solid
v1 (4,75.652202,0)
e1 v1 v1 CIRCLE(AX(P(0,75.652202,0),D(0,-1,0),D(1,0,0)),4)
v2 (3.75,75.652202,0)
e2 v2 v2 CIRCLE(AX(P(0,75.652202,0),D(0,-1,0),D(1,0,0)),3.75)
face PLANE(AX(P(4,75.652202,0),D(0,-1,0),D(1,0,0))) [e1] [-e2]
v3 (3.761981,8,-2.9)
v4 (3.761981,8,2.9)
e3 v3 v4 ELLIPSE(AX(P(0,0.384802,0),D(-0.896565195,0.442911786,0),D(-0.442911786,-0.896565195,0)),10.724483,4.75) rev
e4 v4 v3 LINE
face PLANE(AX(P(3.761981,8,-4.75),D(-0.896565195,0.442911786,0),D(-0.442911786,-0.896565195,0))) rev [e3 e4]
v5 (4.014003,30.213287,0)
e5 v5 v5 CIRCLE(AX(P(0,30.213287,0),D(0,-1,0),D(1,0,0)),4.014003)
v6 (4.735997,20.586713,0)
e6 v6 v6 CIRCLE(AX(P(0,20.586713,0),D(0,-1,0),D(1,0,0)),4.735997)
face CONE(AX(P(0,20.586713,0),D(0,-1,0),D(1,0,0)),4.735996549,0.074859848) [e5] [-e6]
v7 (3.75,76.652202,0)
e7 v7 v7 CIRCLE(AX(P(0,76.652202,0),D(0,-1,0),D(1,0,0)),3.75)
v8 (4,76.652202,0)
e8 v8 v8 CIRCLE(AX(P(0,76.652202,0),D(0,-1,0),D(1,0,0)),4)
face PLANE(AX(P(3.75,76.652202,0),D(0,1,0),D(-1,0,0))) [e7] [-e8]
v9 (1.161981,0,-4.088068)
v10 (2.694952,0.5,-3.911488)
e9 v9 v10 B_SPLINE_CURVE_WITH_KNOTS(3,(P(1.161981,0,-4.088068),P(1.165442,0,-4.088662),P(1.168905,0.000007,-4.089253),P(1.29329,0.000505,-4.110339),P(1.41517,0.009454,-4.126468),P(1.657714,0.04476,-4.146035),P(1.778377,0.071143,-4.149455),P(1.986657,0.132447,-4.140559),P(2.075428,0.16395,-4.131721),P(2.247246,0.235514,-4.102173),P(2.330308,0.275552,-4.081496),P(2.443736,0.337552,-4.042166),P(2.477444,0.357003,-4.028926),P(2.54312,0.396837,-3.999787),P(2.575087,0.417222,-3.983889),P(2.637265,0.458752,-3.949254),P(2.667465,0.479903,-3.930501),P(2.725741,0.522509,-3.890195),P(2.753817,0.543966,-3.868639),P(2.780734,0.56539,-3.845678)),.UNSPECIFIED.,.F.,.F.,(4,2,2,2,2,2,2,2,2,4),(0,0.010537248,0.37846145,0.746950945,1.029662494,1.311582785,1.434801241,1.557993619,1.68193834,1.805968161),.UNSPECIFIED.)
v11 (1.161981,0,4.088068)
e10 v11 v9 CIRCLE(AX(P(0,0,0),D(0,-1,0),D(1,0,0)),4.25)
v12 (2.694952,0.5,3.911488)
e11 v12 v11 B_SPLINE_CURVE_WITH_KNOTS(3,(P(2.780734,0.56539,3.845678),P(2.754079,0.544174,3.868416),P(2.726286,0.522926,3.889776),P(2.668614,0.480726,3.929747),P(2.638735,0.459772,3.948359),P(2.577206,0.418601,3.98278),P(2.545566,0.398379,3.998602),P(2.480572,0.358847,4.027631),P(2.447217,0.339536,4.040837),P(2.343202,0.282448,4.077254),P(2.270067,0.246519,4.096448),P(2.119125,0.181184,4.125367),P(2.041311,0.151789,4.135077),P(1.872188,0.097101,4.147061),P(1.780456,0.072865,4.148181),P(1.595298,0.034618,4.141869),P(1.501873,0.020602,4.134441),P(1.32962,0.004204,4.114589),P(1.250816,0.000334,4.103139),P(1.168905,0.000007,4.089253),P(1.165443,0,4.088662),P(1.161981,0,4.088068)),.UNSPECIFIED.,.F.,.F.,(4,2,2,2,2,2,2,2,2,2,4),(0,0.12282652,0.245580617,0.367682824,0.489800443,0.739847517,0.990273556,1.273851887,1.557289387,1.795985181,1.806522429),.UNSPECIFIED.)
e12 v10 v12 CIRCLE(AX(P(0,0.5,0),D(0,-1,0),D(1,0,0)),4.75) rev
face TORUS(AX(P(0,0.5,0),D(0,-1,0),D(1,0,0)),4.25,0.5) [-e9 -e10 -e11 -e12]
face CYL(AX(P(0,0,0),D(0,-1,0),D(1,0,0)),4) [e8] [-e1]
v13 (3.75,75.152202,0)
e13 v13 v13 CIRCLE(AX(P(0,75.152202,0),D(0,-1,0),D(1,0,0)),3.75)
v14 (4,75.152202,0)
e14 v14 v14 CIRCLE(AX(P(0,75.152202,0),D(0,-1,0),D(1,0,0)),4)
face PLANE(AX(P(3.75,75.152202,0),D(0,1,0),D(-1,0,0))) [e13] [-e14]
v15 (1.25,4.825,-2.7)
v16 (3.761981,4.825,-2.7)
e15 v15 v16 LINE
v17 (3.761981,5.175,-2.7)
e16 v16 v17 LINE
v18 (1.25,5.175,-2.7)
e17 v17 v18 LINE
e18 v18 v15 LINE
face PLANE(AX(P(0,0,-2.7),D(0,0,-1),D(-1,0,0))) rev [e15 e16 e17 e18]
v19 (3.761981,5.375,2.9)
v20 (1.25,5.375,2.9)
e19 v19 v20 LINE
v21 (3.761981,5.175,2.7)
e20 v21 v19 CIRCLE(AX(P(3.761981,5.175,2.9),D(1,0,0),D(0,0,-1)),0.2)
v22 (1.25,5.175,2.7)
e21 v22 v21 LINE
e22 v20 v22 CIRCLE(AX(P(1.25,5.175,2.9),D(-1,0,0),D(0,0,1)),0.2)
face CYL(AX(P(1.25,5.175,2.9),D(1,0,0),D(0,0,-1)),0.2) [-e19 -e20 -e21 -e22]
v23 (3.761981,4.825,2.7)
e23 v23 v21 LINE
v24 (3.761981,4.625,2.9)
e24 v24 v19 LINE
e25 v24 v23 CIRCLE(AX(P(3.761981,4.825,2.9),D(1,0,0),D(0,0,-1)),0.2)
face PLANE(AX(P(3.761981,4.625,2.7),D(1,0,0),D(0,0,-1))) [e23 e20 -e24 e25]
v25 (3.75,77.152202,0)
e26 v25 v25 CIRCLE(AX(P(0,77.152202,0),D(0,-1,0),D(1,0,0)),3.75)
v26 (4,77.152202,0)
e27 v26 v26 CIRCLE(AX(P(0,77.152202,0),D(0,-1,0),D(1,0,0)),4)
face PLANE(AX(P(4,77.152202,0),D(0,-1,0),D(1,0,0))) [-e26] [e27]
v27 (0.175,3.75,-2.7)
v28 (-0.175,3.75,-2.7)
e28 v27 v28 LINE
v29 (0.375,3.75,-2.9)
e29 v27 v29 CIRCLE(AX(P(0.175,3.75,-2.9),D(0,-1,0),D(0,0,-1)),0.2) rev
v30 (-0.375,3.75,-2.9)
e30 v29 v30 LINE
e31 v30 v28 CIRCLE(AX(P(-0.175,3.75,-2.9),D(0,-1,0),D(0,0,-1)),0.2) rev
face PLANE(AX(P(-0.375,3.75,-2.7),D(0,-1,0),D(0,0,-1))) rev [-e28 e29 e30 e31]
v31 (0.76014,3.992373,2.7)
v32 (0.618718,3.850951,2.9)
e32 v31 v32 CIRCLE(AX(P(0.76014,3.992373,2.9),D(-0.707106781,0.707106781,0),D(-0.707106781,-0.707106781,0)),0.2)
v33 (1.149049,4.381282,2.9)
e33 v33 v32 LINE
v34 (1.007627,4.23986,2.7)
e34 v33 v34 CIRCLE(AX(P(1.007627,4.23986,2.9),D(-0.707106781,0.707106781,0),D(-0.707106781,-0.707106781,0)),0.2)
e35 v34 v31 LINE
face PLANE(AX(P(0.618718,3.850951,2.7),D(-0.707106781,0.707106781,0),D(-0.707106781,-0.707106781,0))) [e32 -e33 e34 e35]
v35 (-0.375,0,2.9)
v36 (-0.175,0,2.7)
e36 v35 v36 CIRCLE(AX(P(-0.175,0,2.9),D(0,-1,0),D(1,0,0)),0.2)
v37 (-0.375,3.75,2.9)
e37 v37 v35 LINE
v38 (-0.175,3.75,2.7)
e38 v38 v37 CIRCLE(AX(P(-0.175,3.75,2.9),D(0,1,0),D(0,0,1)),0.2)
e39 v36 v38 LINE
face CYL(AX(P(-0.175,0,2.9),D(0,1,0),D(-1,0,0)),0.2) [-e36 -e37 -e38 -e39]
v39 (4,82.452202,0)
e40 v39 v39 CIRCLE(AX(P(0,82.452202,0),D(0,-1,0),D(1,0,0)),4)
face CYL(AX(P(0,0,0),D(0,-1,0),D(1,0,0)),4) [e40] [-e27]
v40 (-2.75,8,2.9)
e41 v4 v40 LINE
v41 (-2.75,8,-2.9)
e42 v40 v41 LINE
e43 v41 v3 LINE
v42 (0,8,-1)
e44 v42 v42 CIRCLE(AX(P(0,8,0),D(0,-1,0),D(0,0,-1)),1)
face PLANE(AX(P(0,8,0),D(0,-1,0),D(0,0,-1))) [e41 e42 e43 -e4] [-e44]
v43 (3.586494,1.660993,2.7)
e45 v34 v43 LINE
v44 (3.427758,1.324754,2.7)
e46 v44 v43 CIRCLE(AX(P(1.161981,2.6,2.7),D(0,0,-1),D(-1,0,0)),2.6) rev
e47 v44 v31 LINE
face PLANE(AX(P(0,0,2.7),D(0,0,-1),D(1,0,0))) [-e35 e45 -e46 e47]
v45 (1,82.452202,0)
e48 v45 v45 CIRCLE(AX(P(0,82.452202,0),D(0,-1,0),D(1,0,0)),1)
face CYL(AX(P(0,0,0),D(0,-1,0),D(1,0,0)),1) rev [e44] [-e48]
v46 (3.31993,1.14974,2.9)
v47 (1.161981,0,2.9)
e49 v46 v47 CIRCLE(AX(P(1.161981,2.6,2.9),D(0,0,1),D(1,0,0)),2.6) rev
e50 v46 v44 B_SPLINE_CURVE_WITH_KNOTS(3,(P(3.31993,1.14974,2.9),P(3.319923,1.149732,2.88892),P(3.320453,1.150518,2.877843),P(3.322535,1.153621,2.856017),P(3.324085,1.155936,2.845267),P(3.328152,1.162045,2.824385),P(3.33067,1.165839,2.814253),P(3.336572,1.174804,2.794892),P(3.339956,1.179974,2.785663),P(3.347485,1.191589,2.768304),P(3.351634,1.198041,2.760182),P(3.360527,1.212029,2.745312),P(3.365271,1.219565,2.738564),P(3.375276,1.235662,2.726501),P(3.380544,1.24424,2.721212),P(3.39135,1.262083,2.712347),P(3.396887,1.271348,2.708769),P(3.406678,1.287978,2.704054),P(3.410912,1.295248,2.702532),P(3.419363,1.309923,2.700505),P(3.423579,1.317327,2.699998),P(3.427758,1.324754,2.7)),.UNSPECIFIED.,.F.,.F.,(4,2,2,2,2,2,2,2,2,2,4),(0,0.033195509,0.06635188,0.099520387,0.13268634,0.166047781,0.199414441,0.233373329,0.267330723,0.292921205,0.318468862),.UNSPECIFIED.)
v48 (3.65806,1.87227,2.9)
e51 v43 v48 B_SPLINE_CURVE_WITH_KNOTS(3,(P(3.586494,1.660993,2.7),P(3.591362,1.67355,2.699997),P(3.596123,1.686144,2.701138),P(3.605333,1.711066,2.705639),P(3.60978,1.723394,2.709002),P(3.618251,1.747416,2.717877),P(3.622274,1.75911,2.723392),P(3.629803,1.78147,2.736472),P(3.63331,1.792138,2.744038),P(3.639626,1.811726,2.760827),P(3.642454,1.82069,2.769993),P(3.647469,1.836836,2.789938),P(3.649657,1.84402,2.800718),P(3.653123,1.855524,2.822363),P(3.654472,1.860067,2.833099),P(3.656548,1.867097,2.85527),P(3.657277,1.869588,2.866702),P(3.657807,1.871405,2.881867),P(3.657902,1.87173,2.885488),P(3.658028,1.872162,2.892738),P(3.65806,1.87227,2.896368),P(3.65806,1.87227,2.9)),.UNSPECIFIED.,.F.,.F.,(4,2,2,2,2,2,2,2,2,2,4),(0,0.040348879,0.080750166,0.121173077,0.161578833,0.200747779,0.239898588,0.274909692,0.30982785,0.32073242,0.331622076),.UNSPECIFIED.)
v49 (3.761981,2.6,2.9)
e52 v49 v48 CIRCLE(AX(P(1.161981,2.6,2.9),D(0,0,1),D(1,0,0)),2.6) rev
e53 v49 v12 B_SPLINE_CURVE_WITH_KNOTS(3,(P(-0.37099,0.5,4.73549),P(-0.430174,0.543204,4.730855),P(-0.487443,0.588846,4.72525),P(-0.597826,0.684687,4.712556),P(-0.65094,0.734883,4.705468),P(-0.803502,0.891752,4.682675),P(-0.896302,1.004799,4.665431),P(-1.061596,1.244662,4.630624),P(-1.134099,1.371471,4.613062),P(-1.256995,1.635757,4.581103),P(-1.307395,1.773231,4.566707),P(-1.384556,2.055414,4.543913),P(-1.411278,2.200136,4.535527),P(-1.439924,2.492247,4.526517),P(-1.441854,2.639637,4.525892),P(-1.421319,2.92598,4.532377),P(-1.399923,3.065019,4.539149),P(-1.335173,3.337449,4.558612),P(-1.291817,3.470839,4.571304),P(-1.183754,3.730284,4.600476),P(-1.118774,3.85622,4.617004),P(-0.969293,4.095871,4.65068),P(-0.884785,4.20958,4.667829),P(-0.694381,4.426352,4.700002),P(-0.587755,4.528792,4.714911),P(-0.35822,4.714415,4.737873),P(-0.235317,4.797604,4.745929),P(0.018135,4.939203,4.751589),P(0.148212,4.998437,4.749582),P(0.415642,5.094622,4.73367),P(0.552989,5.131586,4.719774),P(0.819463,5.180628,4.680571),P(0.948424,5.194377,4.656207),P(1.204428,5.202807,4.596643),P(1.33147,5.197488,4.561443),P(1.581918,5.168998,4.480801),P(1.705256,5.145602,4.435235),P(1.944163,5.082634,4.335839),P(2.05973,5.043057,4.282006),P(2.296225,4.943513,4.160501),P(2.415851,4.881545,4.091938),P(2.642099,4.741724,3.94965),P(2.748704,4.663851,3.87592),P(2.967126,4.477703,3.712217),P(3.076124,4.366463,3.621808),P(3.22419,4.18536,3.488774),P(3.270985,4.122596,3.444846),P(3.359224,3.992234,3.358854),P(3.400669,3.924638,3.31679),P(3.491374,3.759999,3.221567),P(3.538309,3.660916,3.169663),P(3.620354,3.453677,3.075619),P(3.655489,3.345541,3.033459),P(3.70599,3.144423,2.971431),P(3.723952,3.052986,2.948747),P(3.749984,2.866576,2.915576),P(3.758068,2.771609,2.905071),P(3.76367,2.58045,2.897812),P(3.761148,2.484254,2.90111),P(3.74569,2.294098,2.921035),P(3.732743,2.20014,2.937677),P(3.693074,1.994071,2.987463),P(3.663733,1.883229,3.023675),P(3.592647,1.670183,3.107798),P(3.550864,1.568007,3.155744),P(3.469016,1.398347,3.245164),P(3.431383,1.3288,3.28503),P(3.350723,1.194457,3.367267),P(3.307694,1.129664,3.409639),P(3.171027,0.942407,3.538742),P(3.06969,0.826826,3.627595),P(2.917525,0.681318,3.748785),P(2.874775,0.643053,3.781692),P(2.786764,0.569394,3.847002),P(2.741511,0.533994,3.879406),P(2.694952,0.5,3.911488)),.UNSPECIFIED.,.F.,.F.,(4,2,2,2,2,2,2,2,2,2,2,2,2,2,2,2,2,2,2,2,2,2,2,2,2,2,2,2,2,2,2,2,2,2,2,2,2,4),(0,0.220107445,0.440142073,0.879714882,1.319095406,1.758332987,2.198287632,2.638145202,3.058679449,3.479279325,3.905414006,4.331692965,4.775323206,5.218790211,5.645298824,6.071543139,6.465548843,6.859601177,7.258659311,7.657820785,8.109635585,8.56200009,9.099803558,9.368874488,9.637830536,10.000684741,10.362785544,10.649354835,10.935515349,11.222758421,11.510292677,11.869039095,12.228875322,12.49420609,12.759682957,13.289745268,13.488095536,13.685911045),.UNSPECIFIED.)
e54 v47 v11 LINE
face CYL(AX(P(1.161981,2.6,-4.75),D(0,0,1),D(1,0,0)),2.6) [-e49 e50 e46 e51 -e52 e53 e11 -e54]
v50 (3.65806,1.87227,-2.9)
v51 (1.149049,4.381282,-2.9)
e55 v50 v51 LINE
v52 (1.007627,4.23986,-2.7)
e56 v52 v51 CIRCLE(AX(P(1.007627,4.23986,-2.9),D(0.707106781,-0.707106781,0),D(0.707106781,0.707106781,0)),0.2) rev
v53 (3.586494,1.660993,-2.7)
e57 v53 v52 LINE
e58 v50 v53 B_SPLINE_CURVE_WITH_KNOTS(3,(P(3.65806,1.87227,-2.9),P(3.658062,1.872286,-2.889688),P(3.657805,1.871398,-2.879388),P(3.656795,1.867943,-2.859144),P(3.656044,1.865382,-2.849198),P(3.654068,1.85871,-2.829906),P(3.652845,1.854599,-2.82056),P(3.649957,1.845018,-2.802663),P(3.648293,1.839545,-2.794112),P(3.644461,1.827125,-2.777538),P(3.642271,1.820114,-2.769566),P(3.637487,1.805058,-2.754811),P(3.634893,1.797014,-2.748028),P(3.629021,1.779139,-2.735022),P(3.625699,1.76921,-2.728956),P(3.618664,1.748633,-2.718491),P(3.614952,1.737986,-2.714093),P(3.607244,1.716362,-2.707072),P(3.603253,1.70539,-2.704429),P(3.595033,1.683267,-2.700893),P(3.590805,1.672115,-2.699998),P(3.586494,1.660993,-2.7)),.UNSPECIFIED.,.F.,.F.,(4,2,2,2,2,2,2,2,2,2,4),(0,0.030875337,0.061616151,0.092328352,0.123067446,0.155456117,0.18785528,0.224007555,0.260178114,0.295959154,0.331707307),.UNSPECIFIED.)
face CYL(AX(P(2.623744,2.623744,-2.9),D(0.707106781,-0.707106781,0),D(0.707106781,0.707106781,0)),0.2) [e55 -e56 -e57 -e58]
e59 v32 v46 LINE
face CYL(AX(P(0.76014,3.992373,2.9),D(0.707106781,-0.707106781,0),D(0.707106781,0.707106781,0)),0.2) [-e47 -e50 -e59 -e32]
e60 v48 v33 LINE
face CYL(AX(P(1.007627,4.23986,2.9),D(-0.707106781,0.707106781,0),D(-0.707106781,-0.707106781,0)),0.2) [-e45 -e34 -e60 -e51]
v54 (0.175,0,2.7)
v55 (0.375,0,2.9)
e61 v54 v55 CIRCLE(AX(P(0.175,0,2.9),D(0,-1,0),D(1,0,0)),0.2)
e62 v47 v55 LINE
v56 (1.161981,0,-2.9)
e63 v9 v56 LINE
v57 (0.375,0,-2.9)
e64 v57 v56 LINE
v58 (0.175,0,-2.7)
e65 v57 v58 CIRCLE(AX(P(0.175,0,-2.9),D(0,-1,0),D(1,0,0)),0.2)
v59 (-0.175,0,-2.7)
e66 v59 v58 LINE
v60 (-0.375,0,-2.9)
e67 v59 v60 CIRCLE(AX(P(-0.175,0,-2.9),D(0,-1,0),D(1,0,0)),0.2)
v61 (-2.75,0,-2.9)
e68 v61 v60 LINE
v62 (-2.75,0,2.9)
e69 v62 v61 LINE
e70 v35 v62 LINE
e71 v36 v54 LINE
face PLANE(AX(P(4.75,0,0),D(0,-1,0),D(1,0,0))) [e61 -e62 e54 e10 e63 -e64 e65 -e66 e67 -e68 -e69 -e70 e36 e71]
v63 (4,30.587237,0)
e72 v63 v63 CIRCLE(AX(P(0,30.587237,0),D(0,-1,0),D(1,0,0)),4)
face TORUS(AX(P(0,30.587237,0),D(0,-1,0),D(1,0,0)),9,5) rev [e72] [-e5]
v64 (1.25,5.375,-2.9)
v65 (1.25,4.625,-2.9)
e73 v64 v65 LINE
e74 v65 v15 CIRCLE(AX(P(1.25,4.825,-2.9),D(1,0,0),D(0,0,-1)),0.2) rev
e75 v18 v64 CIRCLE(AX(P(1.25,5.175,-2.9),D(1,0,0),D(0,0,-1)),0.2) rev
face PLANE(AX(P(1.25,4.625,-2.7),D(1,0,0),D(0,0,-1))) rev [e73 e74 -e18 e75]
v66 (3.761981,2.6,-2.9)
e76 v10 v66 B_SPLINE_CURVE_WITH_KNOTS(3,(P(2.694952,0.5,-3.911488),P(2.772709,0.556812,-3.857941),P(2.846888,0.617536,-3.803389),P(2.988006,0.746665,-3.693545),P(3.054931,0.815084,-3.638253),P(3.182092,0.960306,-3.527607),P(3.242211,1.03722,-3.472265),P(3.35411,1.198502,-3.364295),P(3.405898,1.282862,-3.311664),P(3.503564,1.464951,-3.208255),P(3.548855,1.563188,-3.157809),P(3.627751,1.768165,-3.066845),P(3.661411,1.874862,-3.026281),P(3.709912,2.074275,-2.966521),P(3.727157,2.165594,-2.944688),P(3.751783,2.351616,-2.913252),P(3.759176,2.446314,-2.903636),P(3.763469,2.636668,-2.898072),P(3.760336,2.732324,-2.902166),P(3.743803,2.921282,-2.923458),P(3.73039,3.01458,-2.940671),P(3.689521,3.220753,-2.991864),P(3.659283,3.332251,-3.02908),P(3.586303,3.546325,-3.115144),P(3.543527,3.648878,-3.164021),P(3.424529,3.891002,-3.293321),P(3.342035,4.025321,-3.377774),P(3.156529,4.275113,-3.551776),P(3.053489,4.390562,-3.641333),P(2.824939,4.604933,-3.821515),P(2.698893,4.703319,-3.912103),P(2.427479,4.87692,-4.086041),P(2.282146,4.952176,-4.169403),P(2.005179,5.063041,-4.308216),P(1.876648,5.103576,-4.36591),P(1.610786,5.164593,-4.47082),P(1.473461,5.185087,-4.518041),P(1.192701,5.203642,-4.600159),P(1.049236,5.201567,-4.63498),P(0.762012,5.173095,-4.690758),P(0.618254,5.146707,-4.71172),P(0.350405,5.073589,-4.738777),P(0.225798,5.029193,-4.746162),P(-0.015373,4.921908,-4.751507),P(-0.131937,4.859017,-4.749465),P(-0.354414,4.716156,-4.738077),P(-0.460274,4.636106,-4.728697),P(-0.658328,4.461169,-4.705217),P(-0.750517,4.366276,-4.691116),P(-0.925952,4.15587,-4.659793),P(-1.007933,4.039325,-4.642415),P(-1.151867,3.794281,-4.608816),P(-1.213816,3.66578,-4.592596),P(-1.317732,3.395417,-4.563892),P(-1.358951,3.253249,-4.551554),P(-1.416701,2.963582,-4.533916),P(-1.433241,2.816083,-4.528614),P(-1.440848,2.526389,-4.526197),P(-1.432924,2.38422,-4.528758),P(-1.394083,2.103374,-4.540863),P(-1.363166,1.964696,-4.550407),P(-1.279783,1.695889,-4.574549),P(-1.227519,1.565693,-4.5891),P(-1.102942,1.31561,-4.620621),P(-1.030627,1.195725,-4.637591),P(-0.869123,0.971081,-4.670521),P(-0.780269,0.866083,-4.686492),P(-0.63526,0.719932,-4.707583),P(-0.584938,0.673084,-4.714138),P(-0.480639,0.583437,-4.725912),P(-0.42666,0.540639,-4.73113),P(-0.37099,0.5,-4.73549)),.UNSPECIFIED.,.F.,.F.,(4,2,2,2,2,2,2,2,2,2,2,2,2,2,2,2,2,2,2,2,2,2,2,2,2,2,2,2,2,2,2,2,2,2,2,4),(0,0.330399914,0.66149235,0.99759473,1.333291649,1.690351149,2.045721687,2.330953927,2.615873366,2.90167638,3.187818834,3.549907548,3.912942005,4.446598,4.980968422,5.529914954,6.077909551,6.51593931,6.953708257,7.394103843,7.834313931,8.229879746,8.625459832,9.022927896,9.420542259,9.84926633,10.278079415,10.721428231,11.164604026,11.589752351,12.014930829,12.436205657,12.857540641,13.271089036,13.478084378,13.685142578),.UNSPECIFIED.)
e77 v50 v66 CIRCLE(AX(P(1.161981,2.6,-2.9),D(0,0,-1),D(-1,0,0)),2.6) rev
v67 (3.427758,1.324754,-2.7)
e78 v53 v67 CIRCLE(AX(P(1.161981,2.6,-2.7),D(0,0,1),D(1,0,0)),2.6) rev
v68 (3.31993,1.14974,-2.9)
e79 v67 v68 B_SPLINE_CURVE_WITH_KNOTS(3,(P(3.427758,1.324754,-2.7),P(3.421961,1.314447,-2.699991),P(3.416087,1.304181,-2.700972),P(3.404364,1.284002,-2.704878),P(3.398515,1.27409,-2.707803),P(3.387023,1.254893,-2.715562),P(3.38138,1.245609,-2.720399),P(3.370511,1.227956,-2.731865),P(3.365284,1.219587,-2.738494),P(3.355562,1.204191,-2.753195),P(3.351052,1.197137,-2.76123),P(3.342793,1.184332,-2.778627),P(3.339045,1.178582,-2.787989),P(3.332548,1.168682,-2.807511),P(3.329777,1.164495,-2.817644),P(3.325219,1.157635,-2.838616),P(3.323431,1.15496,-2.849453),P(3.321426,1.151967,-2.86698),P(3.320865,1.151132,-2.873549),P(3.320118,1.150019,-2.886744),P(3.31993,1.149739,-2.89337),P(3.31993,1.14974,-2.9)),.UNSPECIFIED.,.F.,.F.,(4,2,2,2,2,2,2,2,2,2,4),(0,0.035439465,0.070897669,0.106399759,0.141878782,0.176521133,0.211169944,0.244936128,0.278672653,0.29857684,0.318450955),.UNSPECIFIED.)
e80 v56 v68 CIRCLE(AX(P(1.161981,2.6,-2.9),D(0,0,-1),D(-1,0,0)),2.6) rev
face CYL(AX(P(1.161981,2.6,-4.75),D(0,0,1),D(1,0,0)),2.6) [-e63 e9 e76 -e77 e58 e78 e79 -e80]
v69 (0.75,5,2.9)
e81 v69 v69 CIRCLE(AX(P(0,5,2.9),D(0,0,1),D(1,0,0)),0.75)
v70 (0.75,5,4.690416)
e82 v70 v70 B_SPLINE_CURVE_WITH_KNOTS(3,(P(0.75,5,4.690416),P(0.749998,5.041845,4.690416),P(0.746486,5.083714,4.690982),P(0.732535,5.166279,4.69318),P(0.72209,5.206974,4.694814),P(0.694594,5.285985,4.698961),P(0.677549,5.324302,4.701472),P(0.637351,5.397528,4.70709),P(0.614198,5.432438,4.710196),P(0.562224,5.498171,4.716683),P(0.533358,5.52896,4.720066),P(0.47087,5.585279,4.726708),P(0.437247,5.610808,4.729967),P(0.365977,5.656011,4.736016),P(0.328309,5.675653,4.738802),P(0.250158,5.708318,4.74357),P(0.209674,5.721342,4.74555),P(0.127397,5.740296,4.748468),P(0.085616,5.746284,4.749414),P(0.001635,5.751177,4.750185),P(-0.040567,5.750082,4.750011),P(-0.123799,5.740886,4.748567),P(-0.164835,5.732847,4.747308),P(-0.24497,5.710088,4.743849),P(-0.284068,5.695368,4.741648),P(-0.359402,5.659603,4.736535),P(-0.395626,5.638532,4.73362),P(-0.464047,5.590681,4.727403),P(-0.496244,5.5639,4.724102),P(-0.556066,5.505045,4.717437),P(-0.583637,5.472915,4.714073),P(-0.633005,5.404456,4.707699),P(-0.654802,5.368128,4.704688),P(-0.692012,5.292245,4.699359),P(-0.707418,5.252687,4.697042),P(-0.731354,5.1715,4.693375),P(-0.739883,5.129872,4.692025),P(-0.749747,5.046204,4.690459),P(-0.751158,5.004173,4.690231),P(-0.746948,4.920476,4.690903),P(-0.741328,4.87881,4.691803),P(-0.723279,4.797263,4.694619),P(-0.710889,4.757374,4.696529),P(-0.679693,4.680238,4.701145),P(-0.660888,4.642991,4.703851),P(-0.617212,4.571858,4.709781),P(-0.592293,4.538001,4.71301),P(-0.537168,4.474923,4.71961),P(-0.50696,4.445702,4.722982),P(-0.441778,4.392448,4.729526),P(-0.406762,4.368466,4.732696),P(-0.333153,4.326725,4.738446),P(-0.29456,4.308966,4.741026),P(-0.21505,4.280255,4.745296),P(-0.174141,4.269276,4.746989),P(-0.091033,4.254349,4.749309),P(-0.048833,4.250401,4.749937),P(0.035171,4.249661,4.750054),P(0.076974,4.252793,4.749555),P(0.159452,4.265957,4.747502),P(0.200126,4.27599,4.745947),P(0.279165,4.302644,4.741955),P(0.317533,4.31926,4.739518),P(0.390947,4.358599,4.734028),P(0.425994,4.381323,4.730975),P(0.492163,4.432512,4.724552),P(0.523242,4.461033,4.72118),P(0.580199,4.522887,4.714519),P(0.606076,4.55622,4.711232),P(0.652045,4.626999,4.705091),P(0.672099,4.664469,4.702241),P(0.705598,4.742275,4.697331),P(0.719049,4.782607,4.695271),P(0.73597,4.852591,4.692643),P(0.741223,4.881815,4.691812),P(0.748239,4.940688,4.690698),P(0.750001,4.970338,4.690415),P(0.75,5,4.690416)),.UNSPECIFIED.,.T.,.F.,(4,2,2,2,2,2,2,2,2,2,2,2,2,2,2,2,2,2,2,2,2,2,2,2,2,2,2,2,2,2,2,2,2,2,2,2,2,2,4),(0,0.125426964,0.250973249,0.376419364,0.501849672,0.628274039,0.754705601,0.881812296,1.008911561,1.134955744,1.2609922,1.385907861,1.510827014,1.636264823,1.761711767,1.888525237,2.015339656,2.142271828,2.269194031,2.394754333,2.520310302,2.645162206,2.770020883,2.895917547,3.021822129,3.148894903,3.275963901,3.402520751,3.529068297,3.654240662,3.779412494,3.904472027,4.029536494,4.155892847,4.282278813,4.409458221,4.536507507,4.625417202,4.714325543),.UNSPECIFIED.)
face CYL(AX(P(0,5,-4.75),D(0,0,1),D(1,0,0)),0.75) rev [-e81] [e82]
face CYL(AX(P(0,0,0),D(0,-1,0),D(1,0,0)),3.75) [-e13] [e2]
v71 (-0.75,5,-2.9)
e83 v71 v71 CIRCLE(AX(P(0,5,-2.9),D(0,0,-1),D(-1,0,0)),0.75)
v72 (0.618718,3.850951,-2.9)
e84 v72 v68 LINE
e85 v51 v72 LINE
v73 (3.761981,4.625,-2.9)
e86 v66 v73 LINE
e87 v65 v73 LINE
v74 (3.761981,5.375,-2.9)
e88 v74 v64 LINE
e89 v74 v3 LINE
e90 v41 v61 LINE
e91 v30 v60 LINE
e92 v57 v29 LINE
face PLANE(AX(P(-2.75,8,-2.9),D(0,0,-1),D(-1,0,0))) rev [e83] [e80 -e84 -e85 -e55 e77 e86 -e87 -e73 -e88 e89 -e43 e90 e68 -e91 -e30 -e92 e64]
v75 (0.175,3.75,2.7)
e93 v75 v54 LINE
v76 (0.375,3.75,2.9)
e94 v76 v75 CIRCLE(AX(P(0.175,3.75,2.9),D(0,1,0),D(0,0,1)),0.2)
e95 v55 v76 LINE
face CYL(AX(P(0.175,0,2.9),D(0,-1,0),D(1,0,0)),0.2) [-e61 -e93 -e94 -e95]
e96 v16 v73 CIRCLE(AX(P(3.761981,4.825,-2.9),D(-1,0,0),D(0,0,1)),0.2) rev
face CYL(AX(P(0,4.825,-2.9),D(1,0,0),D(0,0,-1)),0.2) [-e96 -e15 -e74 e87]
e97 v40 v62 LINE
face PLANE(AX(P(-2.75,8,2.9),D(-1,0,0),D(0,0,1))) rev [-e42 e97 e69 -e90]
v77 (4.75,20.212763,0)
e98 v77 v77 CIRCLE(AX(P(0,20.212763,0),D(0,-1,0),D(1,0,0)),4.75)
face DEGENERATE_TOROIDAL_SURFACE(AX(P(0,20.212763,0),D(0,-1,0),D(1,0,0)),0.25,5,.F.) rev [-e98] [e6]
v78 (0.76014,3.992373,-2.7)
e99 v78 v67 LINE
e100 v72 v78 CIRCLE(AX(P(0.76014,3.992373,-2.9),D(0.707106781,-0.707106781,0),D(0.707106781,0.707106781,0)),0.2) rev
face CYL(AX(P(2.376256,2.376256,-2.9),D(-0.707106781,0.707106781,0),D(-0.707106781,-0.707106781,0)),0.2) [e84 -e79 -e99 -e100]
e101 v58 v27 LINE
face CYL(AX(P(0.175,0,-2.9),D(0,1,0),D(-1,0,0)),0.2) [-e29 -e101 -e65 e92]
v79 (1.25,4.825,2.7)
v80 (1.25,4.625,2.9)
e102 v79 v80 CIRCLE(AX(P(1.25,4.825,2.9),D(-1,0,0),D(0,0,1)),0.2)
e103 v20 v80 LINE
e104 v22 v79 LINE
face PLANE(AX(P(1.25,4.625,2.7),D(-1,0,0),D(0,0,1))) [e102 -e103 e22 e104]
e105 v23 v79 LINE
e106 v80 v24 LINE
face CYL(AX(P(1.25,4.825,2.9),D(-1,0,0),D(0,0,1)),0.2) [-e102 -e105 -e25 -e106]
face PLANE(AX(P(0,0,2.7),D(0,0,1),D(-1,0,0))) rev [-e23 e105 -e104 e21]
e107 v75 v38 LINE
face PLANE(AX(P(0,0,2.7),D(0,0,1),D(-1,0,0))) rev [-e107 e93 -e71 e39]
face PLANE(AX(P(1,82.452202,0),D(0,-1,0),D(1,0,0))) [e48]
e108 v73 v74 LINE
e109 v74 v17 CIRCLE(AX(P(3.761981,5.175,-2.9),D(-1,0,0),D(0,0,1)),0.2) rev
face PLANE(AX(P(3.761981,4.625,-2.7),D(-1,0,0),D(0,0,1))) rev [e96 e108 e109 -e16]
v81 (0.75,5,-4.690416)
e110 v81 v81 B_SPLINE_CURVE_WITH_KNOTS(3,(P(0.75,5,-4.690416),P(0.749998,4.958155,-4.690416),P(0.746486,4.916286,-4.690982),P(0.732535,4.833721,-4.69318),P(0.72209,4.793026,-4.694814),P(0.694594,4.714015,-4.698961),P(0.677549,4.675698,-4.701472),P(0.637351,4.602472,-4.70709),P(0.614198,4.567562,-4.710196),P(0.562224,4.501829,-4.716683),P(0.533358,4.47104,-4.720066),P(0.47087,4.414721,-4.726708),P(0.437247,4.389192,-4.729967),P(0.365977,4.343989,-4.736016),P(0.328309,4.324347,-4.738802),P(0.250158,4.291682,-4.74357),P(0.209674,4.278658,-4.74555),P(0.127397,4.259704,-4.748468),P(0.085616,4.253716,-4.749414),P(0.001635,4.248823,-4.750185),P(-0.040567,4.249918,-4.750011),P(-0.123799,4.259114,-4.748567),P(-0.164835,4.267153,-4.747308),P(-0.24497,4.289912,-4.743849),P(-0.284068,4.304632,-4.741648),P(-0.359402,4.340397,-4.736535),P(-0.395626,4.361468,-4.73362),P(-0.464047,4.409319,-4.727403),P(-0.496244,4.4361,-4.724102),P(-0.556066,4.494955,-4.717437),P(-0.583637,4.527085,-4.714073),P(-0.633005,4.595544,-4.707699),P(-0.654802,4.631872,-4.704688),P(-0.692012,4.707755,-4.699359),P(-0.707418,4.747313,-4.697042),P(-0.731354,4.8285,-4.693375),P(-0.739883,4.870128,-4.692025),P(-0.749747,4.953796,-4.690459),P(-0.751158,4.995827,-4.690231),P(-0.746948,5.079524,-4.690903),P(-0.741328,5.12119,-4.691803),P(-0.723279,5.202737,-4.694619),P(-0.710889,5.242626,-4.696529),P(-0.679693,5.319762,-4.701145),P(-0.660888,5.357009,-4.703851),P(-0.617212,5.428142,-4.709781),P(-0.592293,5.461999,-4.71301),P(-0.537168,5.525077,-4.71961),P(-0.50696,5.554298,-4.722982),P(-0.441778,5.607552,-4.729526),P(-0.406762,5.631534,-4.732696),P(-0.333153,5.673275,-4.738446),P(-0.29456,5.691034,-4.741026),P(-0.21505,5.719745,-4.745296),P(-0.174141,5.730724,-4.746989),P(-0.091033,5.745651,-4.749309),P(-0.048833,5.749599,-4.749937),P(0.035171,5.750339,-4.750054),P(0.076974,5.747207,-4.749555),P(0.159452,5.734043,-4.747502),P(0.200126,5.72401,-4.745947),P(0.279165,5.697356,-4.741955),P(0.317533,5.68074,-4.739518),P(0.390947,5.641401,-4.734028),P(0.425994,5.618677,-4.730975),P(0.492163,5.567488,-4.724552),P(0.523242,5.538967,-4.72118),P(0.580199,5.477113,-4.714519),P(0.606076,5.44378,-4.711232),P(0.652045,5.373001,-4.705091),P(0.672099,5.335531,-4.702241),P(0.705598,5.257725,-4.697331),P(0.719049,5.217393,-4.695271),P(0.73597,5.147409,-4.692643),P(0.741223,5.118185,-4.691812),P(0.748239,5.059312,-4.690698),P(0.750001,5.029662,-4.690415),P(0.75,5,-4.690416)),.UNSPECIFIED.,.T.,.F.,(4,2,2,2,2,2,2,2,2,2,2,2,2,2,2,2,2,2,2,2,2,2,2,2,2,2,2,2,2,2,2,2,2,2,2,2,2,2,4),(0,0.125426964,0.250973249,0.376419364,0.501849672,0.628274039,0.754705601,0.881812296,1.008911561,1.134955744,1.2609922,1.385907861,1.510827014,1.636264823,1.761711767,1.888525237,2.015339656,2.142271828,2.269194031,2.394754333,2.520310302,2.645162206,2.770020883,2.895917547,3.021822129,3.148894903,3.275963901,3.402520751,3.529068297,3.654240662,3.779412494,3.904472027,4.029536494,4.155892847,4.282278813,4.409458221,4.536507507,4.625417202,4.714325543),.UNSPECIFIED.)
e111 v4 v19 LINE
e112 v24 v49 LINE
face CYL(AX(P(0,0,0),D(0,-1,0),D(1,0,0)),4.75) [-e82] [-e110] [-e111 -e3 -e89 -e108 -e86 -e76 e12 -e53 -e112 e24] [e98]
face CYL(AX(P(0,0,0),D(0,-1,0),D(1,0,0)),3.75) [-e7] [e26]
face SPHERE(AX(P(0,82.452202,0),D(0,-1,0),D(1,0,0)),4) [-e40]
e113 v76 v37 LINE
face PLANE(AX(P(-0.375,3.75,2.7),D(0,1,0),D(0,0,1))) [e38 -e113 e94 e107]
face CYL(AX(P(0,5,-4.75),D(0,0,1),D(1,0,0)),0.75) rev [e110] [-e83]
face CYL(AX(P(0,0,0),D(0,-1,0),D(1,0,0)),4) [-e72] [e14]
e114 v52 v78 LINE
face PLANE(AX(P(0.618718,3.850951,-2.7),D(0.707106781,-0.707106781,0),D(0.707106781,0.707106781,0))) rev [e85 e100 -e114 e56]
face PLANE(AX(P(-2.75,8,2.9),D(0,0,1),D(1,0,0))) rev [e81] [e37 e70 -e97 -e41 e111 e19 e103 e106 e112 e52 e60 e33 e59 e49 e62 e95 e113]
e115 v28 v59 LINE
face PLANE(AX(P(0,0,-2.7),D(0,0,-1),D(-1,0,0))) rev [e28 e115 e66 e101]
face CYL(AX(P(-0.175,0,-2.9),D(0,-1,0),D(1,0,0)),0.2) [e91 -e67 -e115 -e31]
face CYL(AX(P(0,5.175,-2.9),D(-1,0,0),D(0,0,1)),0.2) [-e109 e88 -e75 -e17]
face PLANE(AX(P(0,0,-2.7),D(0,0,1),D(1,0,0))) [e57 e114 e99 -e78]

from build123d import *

# Parameters (mm, degrees)
ESQUISSE3_W                  = 7.5
ESQUISSE3_H                  = 5.8
ENL_V_MAT_EXTRU_1_DEPTH      = 8
CONG_1_R                     = 0.5
ENL_V_MAT_EXTRU_2_DEPTH      = 87.712791632
ENL_V_MAT_EXTRU_2_DEPTH_BACK = 87.712791632
ESQUISSE4_R                  = 0.75
ESQUISSE5_W                  = 0.75
ESQUISSE5_H                  = 3.75
ESQUISSE5_W_2                = 2.511980861
ESQUISSE5_H_2                = 0.75
BOSS_EXTRU_1_DEPTH           = 0.2
CONG_2_R                     = 0.2
CONG_2_OF_SYM_TRIE1_R        = 0.2
ENL_V_MAT_EXTRU_3_DEPTH      = 87.919895497


with BuildPart() as part:
    # Esquisse2 → Révolution1 (revolve)
    with BuildSketch(Plane.XY):
        with BuildLine():
            Line((4.014003451, 30.213287326), (4.735996549, 20.586712674))
            ThreePointArc((4.735996549, 20.586712674), (4.746497911, 20.399868856), (4.75, 20.212762933))
            Line((4.75, 20.212762933), (4.75, 0))
            Line((4.75, 0), (1, 0))
            Line((1, 0), (1, 82.452202))
            Line((1, 82.452202), (0, 82.452202))
            Line((0, 82.452202), (0, 86.452202))
            ThreePointArc((0, 86.452202), (2.828427125, 85.280629125), (4, 82.452202))
            Line((4, 82.452202), (4, 77.152202))
            Line((4, 77.152202), (3.75, 77.152202))
            Line((3.75, 77.152202), (3.75, 76.652202))
            Line((3.75, 76.652202), (4, 76.652202))
            Line((4, 76.652202), (4, 75.652202))
            Line((4, 75.652202), (3.75, 75.652202))
            Line((3.75, 75.652202), (3.75, 75.152202))
            Line((3.75, 75.152202), (4, 75.152202))
            Line((4, 75.152202), (4, 30.587237067))
            ThreePointArc((4, 30.587237067), (4.003502089, 30.400131144), (4.014003451, 30.213287326))
        make_face()
    revolve(axis=Axis((0, 0, 0), (0, 1, 0)))

    # Esquisse3 → Enlèv. mat.-Extru.1 (cut)
    with BuildSketch(Plane.XZ):
        with Locations((1, 0)):
            Rectangle(ESQUISSE3_W, ESQUISSE3_H)
    extrude(amount=-ENL_V_MAT_EXTRU_1_DEPTH, mode=Mode.SUBTRACT)

    # Congé1
    cong_1_edges = [part.edges().sort_by_distance(p)[0] for p in [
        (-4.75, 0, 0),
    ]]
    fillet(cong_1_edges, radius=CONG_1_R)

    # Esquisse4 → Enlèv. mat.-Extru.2 (cut, two sides: drawn at the far end of the back side and taken through both)
    with BuildSketch(Plane.XY.offset(-ENL_V_MAT_EXTRU_2_DEPTH_BACK)):
        with Locations((0, 5)):
            Circle(ESQUISSE4_R)
        with BuildLine():
            Line((1.161980861, 0), (3.761980861, 0))
            Line((3.761980861, 0), (3.761980861, 2.6))
            ThreePointArc((3.761980861, 2.6), (3.000458492, 0.761522369), (1.161980861, 0))
        make_face()
        Polygon((3.761980861, 8), (4.75, 10), (4.75, 8), align=None)
    extrude(amount=ENL_V_MAT_EXTRU_2_DEPTH + ENL_V_MAT_EXTRU_2_DEPTH_BACK, mode=Mode.SUBTRACT)

    # Esquisse5 → Boss.-Extru.1 (add)
    with BuildSketch(Plane.XY.offset(-2.9)):
        with Locations((0, 1.875)):
            Rectangle(ESQUISSE5_W, ESQUISSE5_H)
        Polygon((0.618718434, 3.850951481), (1.149048519, 4.381281566), (4.027145904, 1.503184182), (3.496815818, 0.972854096), align=None)
        with Locations((2.50599043, 5)):
            Rectangle(ESQUISSE5_W_2, ESQUISSE5_H_2)
    boss_extru_1 = extrude(amount=BOSS_EXTRU_1_DEPTH)

    # Congé2
    cong_2_edges = [part.edges().sort_by_distance(p)[0] for p in [
        (2.505990431, 5.375, -2.7),
        (2.505990431, 4.625, -2.7),
        (2.588097212, 2.942232874, -2.7),
        (2.057767126, 2.411902788, -2.7),
        (-0.375, 1.875, -2.7),
        (0.375, 1.875, -2.7),
    ]]
    fillet(cong_2_edges, radius=CONG_2_R - 0.0001)  # a hair under: the kernel refuses the full size

    # Symétrie1: Boss.-Extru.1 across plane
    add(boss_extru_1.mirror(Plane.XY))

    # Congé2 of Symétrie1
    cong_2_of_sym_trie1_edges = [part.edges().sort_by_distance(p)[0] for p in [
        (2.505990431, 5.375, 2.7),
        (2.505990431, 4.625, 2.7),
        (2.588097212, 2.942232874, 2.7),
        (2.057767126, 2.411902788, 2.7),
        (-0.375, 1.875, 2.7),
        (0.375, 1.875, 2.7),
    ]]
    fillet(cong_2_of_sym_trie1_edges, radius=CONG_2_OF_SYM_TRIE1_R - 0.0001)  # a hair under: the kernel refuses the full size

    # Esquisse6 → Enlèv. mat.-Extru.3 (cut, through all)
    with BuildSketch(Plane.XY.offset(2.9)):
        with BuildLine():
            Line((4.027145904, 1.503184182), (3.658059706, 1.87227038))
            ThreePointArc((3.658059706, 1.87227038), (3.516870908, 1.49795968), (3.319930166, 1.149739748))
            Line((3.319930166, 1.149739748), (3.496815818, 0.972854096))
            Line((3.496815818, 0.972854096), (4.027145904, 1.503184182))
        make_face()
    extrude(amount=-ENL_V_MAT_EXTRU_3_DEPTH, mode=Mode.SUBTRACT)


solid = part.part
